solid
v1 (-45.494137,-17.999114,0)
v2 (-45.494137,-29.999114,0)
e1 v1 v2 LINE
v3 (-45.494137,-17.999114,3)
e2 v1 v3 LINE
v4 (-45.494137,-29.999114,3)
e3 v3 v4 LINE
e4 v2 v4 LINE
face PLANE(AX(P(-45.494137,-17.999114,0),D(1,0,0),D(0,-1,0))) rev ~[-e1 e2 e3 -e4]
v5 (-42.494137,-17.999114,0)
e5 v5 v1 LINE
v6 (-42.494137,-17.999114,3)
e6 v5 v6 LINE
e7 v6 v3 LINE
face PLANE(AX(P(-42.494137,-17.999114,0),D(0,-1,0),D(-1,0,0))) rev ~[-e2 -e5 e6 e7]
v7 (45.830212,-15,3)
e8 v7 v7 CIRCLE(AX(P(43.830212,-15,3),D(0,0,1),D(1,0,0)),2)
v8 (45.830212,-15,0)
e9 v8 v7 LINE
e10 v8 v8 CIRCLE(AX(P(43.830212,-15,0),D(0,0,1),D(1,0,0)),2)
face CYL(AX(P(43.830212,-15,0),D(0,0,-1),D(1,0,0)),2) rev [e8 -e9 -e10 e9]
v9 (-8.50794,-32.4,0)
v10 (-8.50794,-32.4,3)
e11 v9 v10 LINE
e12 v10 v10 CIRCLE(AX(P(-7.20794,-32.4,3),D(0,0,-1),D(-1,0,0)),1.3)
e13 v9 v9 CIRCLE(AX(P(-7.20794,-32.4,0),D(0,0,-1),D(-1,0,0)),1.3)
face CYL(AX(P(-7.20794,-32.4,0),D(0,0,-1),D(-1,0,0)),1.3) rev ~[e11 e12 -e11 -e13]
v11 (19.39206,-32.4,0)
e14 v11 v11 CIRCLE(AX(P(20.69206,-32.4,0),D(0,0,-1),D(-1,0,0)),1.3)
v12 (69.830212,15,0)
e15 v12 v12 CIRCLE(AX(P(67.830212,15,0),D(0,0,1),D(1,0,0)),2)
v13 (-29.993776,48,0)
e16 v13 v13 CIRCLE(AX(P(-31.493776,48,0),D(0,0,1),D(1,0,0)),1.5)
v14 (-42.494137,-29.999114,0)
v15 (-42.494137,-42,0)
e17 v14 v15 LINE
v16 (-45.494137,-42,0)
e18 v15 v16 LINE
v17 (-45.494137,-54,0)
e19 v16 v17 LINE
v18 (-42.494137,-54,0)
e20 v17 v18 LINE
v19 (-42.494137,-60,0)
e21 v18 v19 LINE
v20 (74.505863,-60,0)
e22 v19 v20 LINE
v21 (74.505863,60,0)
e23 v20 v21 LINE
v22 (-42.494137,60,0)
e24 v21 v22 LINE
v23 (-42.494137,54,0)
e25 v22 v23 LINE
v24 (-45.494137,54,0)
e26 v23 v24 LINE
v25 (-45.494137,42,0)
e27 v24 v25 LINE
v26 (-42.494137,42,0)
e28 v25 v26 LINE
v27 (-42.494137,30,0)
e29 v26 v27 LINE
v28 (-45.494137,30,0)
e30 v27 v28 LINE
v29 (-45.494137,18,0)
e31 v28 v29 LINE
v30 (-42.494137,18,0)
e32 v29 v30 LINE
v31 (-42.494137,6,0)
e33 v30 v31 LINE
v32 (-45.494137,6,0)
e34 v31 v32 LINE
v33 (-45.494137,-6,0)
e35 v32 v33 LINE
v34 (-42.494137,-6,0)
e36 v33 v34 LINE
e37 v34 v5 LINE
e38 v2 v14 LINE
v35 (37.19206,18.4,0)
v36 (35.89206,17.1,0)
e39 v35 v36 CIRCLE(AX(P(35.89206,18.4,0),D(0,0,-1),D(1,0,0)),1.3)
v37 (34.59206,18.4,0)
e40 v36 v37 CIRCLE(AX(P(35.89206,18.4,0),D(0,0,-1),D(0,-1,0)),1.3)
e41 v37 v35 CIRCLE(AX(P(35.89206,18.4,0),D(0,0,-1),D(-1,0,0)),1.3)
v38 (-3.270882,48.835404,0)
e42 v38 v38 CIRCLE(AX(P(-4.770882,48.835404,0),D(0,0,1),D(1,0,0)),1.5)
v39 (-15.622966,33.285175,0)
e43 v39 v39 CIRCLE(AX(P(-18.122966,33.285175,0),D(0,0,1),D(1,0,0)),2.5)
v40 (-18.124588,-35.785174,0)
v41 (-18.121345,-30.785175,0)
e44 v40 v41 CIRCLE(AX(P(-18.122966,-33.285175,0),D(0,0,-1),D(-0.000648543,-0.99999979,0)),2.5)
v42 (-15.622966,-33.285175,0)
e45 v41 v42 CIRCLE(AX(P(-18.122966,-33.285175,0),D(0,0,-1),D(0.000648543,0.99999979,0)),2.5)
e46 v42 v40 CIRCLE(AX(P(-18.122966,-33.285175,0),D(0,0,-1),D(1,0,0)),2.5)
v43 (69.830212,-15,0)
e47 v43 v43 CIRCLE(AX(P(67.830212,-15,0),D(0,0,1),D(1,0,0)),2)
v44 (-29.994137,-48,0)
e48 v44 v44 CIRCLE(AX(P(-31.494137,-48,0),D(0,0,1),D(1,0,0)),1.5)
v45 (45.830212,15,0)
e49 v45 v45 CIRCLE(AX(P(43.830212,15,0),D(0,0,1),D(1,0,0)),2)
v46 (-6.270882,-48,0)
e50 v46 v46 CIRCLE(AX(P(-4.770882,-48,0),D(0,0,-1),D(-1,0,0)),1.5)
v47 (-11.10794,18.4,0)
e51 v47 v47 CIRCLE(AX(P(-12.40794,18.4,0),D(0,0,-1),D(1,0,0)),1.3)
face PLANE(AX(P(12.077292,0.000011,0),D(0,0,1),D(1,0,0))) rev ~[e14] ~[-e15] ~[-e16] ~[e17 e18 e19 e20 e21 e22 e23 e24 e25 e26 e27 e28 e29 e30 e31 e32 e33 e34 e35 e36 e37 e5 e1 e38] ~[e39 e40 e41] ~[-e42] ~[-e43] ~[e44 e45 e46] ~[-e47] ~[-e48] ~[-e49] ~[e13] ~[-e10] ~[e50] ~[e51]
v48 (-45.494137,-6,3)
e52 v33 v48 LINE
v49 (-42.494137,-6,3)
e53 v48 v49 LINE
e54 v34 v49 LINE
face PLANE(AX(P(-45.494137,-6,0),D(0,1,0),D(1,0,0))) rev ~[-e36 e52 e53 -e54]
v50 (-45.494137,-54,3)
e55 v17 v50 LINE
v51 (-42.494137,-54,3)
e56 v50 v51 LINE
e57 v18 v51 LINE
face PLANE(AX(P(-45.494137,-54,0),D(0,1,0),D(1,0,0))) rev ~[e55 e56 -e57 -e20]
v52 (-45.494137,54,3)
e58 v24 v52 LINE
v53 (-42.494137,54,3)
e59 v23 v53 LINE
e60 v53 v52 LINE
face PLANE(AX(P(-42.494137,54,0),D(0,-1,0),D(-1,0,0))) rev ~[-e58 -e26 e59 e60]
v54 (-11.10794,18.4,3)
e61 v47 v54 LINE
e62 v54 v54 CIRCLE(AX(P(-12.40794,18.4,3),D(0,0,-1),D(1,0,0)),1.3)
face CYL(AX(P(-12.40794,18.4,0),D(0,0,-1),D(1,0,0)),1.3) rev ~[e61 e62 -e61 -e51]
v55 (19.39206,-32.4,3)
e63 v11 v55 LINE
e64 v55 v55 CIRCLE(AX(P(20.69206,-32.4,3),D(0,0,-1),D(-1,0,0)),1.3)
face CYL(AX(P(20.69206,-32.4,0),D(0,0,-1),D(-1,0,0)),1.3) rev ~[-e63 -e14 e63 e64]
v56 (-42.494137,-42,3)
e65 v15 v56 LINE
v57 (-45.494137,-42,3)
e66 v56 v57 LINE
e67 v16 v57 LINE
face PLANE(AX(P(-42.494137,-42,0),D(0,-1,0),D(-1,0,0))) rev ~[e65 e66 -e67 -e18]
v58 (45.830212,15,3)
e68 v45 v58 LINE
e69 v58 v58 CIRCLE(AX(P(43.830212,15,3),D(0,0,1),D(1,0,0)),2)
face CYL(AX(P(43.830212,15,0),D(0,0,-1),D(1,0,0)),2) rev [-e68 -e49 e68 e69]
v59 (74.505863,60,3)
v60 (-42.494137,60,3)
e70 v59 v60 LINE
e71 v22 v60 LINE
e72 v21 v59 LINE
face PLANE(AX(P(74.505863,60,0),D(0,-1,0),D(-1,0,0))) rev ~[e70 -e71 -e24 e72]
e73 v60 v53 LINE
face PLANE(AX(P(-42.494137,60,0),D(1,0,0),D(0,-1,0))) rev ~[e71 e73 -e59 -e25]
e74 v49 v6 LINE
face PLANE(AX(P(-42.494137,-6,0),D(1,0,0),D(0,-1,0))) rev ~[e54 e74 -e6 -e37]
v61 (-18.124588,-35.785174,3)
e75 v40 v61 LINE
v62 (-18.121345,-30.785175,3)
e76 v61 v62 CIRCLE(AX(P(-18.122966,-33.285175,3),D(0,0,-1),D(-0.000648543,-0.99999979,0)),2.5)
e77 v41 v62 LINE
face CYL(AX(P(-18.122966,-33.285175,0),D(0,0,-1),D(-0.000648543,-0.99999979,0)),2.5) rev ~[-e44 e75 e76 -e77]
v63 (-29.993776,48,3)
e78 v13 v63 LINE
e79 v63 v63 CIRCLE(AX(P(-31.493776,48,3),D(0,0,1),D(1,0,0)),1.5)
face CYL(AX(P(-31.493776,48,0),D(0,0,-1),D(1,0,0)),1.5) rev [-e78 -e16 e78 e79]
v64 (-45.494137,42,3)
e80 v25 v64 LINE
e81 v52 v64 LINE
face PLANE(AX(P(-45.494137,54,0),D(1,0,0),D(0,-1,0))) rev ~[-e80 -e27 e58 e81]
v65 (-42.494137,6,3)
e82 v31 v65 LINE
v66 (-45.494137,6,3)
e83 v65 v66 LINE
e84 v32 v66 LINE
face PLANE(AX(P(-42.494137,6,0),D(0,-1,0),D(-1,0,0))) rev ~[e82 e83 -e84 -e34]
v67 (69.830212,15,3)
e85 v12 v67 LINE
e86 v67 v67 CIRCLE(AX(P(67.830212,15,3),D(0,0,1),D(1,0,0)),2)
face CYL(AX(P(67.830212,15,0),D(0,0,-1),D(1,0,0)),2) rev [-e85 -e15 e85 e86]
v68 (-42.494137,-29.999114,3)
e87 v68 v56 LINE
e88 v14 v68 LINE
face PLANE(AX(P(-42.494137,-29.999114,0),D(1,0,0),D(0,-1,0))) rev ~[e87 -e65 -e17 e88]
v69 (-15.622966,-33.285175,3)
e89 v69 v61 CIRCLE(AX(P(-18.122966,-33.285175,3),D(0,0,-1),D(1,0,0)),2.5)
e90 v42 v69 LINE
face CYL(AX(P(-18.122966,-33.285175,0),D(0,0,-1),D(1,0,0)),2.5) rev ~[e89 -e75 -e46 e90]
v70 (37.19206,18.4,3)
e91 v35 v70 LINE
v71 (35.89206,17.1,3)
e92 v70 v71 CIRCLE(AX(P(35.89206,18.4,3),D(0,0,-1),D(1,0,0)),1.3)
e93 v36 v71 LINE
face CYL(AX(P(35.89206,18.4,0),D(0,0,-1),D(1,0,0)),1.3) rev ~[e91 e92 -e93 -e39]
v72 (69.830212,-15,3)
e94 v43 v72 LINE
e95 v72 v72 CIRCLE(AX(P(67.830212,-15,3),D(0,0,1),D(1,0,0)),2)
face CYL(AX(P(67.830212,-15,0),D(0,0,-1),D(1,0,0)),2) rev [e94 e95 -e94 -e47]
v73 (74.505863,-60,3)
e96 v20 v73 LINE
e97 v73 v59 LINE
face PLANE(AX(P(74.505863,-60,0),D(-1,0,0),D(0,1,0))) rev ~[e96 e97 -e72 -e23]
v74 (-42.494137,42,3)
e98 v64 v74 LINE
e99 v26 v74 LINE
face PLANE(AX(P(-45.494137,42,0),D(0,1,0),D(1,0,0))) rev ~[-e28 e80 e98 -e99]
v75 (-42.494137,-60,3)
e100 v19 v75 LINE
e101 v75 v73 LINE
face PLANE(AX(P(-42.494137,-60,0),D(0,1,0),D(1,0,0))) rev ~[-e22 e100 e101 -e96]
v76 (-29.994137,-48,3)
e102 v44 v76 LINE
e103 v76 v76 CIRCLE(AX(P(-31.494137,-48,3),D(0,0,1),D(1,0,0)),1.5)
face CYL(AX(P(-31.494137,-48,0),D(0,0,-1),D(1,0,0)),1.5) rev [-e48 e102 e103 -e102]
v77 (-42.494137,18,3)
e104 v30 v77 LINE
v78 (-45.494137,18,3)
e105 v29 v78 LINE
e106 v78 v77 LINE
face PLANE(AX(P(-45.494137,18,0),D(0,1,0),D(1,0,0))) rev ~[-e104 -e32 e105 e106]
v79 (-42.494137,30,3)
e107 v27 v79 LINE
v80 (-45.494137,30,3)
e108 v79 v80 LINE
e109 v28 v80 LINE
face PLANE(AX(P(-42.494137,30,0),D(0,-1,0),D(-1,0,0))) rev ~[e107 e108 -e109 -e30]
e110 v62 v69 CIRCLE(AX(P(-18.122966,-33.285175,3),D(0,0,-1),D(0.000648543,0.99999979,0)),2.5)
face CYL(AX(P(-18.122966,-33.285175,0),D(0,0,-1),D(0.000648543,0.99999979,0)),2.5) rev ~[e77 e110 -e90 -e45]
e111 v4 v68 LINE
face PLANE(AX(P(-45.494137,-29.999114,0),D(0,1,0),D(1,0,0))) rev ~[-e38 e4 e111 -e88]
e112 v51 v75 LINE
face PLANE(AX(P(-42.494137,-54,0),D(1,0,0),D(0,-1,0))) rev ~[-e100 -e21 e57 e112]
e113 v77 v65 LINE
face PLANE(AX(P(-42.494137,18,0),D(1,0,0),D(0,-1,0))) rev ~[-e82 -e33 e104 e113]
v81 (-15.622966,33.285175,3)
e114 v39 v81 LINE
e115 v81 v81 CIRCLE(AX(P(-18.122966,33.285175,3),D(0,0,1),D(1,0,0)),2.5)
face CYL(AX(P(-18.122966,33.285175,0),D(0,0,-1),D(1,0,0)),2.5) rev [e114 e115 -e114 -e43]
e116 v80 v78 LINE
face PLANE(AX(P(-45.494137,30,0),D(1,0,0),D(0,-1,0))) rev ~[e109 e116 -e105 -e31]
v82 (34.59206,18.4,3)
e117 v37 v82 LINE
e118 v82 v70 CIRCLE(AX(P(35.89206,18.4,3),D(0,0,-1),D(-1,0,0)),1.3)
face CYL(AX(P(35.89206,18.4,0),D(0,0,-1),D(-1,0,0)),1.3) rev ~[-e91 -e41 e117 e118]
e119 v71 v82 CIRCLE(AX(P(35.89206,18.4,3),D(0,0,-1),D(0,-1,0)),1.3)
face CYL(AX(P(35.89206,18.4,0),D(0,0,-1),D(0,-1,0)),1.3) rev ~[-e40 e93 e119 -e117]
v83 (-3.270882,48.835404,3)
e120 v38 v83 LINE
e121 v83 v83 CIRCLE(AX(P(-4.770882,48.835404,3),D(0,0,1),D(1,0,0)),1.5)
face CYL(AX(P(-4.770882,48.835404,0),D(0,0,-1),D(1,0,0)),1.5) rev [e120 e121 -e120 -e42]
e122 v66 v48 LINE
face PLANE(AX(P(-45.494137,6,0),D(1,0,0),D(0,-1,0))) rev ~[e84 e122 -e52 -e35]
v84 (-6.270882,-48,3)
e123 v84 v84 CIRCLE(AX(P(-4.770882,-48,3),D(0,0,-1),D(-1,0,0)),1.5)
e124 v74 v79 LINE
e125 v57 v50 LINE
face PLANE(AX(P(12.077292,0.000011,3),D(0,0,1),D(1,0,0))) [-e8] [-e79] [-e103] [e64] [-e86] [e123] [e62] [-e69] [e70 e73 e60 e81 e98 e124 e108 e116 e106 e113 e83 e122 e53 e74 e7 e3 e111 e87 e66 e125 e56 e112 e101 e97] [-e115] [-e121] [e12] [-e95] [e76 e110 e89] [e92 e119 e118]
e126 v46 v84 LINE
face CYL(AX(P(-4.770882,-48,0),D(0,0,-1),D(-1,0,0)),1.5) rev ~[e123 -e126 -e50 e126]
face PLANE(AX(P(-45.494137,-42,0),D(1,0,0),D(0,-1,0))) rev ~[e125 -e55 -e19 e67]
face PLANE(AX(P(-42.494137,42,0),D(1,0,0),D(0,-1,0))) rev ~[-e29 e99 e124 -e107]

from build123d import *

# Parameters (mm, degrees)
F0_R     = 1.5
F0_R_2   = 2
F0_R_3   = 2.5
F1_DEPTH = 3


with BuildPart() as f1:
    # F0 (on Top) → F1 (new body)
    with BuildSketch(Plane.XY):
        Polygon((74.5058632415, 0), (74.5058632415, 60), (-42.4941367585, 60), (-42.4941367585, 54), (-45.4941367585, 54), (-45.4941367585, 42), (-42.4941367585, 42), (-42.4941367585, 30), (-45.4941367585, 30), (-45.4941367585, 18), (-42.4941367585, 18), (-42.4941367585, 6), (-45.4941367585, 6), (-45.4941367585, -6), (-42.4941367585, -6), (-42.4941367585, -17.9991139914), (-45.4941367585, -17.9991139914), (-45.4941367585, -29.9991139914), (-42.4941367585, -29.9991139914), (-42.4941367585, -42), (-45.4941367585, -42), (-45.4941367585, -54), (-42.4941367585, -54), (-42.4941367585, -60), (74.5058632415, -60), align=None)
        with Locations((-31.4941367585, -48)):
            Circle(F0_R, mode=Mode.SUBTRACT)
        with BuildLine():
            ThreePointArc((-15.6229661617, -33.2851748408), (-16.3557725378, -35.053514937), (-18.1245875184, -35.785174315))
            ThreePointArc((-18.1245875184, -35.785174315), (-20.6229656359, -33.2835534841), (-18.1213448049, -30.7851753666))
            ThreePointArc((-18.1213448049, -30.7851753666), (-16.3546260654, -31.517981217), (-15.6229661617, -33.2851748408))
        make_face(mode=Mode.SUBTRACT)
        with BuildLine():
            ThreePointArc((-3.2708819532, -48), (-4.7708819532, -49.5), (-6.2708819532, -48))
            ThreePointArc((-6.2708819532, -48), (-4.7708819532, -46.5), (-3.2708819532, -48))
        make_face(mode=Mode.SUBTRACT)
        with BuildLine():
            Line((35.8920598827, 17.1), (35.8920598827, 0))
            Line((35.8920598827, 0), (35.8920598827, -32.4))
            Line((35.8920598827, -32.4), (21.9920598827, -32.4))
            ThreePointArc((21.9920598827, -32.4), (20.6920598827, -33.7), (19.3920598827, -32.4))
            Line((19.3920598827, -32.4), (-5.9079401173, -32.4))
            ThreePointArc((-5.9079401173, -32.4), (-7.2079401173, -33.7), (-8.5079401173, -32.4))
            Line((-8.5079401173, -32.4), (-12.4079401173, -32.4))
            Line((-12.4079401173, -32.4), (-12.4079401173, 17.1))
            ThreePointArc((-12.4079401173, 17.1), (-13.3271789328, 19.3192388155), (-11.1079401173, 18.4))
            Line((-11.1079401173, 18.4), (34.5920598827, 18.4))
            ThreePointArc((34.5920598827, 18.4), (35.8920598827, 19.7), (37.1920598827, 18.4))
            ThreePointArc((37.1920598827, 18.4), (36.8112986983, 17.4807611845), (35.8920598827, 17.1))
        make_face(mode=Mode.SUBTRACT)
        with Locations((43.8302124143, -15)):
            Circle(F0_R_2, mode=Mode.SUBTRACT)
        with Locations((67.8302124143, -15)):
            Circle(F0_R_2, mode=Mode.SUBTRACT)
        with Locations((-18.1229661617, 33.2851748408)):
            Circle(F0_R_3, mode=Mode.SUBTRACT)
        with Locations((-31.4937761504, 48)):
            Circle(F0_R, mode=Mode.SUBTRACT)
        with Locations((-4.7708819532, 48.8354042139)):
            Circle(F0_R, mode=Mode.SUBTRACT)
        with Locations((43.8302124143, 15)):
            Circle(F0_R_2, mode=Mode.SUBTRACT)
        with Locations((67.8302124143, 15)):
            Circle(F0_R_2, mode=Mode.SUBTRACT)
        with BuildLine():
            Line((35.8920598827, -32.4), (35.8920598827, 0))
            Line((35.8920598827, 0), (35.8920598827, 17.1))
            ThreePointArc((35.8920598827, 17.1), (34.9728210672, 17.4807611845), (34.5920598827, 18.4))
            Line((34.5920598827, 18.4), (-11.1079401173, 18.4))
            ThreePointArc((-11.1079401173, 18.4), (-11.4887013017, 17.4807611845), (-12.4079401173, 17.1))
            Line((-12.4079401173, 17.1), (-12.4079401173, -32.4))
            Line((-12.4079401173, -32.4), (-8.5079401173, -32.4))
            ThreePointArc((-8.5079401173, -32.4), (-7.2079401173, -31.1), (-5.9079401173, -32.4))
            Line((-5.9079401173, -32.4), (19.3920598827, -32.4))
            ThreePointArc((19.3920598827, -32.4), (20.6920598827, -31.1), (21.9920598827, -32.4))
            Line((21.9920598827, -32.4), (35.8920598827, -32.4))
        make_face()
    extrude(amount=F1_DEPTH)


solid = f1.part
